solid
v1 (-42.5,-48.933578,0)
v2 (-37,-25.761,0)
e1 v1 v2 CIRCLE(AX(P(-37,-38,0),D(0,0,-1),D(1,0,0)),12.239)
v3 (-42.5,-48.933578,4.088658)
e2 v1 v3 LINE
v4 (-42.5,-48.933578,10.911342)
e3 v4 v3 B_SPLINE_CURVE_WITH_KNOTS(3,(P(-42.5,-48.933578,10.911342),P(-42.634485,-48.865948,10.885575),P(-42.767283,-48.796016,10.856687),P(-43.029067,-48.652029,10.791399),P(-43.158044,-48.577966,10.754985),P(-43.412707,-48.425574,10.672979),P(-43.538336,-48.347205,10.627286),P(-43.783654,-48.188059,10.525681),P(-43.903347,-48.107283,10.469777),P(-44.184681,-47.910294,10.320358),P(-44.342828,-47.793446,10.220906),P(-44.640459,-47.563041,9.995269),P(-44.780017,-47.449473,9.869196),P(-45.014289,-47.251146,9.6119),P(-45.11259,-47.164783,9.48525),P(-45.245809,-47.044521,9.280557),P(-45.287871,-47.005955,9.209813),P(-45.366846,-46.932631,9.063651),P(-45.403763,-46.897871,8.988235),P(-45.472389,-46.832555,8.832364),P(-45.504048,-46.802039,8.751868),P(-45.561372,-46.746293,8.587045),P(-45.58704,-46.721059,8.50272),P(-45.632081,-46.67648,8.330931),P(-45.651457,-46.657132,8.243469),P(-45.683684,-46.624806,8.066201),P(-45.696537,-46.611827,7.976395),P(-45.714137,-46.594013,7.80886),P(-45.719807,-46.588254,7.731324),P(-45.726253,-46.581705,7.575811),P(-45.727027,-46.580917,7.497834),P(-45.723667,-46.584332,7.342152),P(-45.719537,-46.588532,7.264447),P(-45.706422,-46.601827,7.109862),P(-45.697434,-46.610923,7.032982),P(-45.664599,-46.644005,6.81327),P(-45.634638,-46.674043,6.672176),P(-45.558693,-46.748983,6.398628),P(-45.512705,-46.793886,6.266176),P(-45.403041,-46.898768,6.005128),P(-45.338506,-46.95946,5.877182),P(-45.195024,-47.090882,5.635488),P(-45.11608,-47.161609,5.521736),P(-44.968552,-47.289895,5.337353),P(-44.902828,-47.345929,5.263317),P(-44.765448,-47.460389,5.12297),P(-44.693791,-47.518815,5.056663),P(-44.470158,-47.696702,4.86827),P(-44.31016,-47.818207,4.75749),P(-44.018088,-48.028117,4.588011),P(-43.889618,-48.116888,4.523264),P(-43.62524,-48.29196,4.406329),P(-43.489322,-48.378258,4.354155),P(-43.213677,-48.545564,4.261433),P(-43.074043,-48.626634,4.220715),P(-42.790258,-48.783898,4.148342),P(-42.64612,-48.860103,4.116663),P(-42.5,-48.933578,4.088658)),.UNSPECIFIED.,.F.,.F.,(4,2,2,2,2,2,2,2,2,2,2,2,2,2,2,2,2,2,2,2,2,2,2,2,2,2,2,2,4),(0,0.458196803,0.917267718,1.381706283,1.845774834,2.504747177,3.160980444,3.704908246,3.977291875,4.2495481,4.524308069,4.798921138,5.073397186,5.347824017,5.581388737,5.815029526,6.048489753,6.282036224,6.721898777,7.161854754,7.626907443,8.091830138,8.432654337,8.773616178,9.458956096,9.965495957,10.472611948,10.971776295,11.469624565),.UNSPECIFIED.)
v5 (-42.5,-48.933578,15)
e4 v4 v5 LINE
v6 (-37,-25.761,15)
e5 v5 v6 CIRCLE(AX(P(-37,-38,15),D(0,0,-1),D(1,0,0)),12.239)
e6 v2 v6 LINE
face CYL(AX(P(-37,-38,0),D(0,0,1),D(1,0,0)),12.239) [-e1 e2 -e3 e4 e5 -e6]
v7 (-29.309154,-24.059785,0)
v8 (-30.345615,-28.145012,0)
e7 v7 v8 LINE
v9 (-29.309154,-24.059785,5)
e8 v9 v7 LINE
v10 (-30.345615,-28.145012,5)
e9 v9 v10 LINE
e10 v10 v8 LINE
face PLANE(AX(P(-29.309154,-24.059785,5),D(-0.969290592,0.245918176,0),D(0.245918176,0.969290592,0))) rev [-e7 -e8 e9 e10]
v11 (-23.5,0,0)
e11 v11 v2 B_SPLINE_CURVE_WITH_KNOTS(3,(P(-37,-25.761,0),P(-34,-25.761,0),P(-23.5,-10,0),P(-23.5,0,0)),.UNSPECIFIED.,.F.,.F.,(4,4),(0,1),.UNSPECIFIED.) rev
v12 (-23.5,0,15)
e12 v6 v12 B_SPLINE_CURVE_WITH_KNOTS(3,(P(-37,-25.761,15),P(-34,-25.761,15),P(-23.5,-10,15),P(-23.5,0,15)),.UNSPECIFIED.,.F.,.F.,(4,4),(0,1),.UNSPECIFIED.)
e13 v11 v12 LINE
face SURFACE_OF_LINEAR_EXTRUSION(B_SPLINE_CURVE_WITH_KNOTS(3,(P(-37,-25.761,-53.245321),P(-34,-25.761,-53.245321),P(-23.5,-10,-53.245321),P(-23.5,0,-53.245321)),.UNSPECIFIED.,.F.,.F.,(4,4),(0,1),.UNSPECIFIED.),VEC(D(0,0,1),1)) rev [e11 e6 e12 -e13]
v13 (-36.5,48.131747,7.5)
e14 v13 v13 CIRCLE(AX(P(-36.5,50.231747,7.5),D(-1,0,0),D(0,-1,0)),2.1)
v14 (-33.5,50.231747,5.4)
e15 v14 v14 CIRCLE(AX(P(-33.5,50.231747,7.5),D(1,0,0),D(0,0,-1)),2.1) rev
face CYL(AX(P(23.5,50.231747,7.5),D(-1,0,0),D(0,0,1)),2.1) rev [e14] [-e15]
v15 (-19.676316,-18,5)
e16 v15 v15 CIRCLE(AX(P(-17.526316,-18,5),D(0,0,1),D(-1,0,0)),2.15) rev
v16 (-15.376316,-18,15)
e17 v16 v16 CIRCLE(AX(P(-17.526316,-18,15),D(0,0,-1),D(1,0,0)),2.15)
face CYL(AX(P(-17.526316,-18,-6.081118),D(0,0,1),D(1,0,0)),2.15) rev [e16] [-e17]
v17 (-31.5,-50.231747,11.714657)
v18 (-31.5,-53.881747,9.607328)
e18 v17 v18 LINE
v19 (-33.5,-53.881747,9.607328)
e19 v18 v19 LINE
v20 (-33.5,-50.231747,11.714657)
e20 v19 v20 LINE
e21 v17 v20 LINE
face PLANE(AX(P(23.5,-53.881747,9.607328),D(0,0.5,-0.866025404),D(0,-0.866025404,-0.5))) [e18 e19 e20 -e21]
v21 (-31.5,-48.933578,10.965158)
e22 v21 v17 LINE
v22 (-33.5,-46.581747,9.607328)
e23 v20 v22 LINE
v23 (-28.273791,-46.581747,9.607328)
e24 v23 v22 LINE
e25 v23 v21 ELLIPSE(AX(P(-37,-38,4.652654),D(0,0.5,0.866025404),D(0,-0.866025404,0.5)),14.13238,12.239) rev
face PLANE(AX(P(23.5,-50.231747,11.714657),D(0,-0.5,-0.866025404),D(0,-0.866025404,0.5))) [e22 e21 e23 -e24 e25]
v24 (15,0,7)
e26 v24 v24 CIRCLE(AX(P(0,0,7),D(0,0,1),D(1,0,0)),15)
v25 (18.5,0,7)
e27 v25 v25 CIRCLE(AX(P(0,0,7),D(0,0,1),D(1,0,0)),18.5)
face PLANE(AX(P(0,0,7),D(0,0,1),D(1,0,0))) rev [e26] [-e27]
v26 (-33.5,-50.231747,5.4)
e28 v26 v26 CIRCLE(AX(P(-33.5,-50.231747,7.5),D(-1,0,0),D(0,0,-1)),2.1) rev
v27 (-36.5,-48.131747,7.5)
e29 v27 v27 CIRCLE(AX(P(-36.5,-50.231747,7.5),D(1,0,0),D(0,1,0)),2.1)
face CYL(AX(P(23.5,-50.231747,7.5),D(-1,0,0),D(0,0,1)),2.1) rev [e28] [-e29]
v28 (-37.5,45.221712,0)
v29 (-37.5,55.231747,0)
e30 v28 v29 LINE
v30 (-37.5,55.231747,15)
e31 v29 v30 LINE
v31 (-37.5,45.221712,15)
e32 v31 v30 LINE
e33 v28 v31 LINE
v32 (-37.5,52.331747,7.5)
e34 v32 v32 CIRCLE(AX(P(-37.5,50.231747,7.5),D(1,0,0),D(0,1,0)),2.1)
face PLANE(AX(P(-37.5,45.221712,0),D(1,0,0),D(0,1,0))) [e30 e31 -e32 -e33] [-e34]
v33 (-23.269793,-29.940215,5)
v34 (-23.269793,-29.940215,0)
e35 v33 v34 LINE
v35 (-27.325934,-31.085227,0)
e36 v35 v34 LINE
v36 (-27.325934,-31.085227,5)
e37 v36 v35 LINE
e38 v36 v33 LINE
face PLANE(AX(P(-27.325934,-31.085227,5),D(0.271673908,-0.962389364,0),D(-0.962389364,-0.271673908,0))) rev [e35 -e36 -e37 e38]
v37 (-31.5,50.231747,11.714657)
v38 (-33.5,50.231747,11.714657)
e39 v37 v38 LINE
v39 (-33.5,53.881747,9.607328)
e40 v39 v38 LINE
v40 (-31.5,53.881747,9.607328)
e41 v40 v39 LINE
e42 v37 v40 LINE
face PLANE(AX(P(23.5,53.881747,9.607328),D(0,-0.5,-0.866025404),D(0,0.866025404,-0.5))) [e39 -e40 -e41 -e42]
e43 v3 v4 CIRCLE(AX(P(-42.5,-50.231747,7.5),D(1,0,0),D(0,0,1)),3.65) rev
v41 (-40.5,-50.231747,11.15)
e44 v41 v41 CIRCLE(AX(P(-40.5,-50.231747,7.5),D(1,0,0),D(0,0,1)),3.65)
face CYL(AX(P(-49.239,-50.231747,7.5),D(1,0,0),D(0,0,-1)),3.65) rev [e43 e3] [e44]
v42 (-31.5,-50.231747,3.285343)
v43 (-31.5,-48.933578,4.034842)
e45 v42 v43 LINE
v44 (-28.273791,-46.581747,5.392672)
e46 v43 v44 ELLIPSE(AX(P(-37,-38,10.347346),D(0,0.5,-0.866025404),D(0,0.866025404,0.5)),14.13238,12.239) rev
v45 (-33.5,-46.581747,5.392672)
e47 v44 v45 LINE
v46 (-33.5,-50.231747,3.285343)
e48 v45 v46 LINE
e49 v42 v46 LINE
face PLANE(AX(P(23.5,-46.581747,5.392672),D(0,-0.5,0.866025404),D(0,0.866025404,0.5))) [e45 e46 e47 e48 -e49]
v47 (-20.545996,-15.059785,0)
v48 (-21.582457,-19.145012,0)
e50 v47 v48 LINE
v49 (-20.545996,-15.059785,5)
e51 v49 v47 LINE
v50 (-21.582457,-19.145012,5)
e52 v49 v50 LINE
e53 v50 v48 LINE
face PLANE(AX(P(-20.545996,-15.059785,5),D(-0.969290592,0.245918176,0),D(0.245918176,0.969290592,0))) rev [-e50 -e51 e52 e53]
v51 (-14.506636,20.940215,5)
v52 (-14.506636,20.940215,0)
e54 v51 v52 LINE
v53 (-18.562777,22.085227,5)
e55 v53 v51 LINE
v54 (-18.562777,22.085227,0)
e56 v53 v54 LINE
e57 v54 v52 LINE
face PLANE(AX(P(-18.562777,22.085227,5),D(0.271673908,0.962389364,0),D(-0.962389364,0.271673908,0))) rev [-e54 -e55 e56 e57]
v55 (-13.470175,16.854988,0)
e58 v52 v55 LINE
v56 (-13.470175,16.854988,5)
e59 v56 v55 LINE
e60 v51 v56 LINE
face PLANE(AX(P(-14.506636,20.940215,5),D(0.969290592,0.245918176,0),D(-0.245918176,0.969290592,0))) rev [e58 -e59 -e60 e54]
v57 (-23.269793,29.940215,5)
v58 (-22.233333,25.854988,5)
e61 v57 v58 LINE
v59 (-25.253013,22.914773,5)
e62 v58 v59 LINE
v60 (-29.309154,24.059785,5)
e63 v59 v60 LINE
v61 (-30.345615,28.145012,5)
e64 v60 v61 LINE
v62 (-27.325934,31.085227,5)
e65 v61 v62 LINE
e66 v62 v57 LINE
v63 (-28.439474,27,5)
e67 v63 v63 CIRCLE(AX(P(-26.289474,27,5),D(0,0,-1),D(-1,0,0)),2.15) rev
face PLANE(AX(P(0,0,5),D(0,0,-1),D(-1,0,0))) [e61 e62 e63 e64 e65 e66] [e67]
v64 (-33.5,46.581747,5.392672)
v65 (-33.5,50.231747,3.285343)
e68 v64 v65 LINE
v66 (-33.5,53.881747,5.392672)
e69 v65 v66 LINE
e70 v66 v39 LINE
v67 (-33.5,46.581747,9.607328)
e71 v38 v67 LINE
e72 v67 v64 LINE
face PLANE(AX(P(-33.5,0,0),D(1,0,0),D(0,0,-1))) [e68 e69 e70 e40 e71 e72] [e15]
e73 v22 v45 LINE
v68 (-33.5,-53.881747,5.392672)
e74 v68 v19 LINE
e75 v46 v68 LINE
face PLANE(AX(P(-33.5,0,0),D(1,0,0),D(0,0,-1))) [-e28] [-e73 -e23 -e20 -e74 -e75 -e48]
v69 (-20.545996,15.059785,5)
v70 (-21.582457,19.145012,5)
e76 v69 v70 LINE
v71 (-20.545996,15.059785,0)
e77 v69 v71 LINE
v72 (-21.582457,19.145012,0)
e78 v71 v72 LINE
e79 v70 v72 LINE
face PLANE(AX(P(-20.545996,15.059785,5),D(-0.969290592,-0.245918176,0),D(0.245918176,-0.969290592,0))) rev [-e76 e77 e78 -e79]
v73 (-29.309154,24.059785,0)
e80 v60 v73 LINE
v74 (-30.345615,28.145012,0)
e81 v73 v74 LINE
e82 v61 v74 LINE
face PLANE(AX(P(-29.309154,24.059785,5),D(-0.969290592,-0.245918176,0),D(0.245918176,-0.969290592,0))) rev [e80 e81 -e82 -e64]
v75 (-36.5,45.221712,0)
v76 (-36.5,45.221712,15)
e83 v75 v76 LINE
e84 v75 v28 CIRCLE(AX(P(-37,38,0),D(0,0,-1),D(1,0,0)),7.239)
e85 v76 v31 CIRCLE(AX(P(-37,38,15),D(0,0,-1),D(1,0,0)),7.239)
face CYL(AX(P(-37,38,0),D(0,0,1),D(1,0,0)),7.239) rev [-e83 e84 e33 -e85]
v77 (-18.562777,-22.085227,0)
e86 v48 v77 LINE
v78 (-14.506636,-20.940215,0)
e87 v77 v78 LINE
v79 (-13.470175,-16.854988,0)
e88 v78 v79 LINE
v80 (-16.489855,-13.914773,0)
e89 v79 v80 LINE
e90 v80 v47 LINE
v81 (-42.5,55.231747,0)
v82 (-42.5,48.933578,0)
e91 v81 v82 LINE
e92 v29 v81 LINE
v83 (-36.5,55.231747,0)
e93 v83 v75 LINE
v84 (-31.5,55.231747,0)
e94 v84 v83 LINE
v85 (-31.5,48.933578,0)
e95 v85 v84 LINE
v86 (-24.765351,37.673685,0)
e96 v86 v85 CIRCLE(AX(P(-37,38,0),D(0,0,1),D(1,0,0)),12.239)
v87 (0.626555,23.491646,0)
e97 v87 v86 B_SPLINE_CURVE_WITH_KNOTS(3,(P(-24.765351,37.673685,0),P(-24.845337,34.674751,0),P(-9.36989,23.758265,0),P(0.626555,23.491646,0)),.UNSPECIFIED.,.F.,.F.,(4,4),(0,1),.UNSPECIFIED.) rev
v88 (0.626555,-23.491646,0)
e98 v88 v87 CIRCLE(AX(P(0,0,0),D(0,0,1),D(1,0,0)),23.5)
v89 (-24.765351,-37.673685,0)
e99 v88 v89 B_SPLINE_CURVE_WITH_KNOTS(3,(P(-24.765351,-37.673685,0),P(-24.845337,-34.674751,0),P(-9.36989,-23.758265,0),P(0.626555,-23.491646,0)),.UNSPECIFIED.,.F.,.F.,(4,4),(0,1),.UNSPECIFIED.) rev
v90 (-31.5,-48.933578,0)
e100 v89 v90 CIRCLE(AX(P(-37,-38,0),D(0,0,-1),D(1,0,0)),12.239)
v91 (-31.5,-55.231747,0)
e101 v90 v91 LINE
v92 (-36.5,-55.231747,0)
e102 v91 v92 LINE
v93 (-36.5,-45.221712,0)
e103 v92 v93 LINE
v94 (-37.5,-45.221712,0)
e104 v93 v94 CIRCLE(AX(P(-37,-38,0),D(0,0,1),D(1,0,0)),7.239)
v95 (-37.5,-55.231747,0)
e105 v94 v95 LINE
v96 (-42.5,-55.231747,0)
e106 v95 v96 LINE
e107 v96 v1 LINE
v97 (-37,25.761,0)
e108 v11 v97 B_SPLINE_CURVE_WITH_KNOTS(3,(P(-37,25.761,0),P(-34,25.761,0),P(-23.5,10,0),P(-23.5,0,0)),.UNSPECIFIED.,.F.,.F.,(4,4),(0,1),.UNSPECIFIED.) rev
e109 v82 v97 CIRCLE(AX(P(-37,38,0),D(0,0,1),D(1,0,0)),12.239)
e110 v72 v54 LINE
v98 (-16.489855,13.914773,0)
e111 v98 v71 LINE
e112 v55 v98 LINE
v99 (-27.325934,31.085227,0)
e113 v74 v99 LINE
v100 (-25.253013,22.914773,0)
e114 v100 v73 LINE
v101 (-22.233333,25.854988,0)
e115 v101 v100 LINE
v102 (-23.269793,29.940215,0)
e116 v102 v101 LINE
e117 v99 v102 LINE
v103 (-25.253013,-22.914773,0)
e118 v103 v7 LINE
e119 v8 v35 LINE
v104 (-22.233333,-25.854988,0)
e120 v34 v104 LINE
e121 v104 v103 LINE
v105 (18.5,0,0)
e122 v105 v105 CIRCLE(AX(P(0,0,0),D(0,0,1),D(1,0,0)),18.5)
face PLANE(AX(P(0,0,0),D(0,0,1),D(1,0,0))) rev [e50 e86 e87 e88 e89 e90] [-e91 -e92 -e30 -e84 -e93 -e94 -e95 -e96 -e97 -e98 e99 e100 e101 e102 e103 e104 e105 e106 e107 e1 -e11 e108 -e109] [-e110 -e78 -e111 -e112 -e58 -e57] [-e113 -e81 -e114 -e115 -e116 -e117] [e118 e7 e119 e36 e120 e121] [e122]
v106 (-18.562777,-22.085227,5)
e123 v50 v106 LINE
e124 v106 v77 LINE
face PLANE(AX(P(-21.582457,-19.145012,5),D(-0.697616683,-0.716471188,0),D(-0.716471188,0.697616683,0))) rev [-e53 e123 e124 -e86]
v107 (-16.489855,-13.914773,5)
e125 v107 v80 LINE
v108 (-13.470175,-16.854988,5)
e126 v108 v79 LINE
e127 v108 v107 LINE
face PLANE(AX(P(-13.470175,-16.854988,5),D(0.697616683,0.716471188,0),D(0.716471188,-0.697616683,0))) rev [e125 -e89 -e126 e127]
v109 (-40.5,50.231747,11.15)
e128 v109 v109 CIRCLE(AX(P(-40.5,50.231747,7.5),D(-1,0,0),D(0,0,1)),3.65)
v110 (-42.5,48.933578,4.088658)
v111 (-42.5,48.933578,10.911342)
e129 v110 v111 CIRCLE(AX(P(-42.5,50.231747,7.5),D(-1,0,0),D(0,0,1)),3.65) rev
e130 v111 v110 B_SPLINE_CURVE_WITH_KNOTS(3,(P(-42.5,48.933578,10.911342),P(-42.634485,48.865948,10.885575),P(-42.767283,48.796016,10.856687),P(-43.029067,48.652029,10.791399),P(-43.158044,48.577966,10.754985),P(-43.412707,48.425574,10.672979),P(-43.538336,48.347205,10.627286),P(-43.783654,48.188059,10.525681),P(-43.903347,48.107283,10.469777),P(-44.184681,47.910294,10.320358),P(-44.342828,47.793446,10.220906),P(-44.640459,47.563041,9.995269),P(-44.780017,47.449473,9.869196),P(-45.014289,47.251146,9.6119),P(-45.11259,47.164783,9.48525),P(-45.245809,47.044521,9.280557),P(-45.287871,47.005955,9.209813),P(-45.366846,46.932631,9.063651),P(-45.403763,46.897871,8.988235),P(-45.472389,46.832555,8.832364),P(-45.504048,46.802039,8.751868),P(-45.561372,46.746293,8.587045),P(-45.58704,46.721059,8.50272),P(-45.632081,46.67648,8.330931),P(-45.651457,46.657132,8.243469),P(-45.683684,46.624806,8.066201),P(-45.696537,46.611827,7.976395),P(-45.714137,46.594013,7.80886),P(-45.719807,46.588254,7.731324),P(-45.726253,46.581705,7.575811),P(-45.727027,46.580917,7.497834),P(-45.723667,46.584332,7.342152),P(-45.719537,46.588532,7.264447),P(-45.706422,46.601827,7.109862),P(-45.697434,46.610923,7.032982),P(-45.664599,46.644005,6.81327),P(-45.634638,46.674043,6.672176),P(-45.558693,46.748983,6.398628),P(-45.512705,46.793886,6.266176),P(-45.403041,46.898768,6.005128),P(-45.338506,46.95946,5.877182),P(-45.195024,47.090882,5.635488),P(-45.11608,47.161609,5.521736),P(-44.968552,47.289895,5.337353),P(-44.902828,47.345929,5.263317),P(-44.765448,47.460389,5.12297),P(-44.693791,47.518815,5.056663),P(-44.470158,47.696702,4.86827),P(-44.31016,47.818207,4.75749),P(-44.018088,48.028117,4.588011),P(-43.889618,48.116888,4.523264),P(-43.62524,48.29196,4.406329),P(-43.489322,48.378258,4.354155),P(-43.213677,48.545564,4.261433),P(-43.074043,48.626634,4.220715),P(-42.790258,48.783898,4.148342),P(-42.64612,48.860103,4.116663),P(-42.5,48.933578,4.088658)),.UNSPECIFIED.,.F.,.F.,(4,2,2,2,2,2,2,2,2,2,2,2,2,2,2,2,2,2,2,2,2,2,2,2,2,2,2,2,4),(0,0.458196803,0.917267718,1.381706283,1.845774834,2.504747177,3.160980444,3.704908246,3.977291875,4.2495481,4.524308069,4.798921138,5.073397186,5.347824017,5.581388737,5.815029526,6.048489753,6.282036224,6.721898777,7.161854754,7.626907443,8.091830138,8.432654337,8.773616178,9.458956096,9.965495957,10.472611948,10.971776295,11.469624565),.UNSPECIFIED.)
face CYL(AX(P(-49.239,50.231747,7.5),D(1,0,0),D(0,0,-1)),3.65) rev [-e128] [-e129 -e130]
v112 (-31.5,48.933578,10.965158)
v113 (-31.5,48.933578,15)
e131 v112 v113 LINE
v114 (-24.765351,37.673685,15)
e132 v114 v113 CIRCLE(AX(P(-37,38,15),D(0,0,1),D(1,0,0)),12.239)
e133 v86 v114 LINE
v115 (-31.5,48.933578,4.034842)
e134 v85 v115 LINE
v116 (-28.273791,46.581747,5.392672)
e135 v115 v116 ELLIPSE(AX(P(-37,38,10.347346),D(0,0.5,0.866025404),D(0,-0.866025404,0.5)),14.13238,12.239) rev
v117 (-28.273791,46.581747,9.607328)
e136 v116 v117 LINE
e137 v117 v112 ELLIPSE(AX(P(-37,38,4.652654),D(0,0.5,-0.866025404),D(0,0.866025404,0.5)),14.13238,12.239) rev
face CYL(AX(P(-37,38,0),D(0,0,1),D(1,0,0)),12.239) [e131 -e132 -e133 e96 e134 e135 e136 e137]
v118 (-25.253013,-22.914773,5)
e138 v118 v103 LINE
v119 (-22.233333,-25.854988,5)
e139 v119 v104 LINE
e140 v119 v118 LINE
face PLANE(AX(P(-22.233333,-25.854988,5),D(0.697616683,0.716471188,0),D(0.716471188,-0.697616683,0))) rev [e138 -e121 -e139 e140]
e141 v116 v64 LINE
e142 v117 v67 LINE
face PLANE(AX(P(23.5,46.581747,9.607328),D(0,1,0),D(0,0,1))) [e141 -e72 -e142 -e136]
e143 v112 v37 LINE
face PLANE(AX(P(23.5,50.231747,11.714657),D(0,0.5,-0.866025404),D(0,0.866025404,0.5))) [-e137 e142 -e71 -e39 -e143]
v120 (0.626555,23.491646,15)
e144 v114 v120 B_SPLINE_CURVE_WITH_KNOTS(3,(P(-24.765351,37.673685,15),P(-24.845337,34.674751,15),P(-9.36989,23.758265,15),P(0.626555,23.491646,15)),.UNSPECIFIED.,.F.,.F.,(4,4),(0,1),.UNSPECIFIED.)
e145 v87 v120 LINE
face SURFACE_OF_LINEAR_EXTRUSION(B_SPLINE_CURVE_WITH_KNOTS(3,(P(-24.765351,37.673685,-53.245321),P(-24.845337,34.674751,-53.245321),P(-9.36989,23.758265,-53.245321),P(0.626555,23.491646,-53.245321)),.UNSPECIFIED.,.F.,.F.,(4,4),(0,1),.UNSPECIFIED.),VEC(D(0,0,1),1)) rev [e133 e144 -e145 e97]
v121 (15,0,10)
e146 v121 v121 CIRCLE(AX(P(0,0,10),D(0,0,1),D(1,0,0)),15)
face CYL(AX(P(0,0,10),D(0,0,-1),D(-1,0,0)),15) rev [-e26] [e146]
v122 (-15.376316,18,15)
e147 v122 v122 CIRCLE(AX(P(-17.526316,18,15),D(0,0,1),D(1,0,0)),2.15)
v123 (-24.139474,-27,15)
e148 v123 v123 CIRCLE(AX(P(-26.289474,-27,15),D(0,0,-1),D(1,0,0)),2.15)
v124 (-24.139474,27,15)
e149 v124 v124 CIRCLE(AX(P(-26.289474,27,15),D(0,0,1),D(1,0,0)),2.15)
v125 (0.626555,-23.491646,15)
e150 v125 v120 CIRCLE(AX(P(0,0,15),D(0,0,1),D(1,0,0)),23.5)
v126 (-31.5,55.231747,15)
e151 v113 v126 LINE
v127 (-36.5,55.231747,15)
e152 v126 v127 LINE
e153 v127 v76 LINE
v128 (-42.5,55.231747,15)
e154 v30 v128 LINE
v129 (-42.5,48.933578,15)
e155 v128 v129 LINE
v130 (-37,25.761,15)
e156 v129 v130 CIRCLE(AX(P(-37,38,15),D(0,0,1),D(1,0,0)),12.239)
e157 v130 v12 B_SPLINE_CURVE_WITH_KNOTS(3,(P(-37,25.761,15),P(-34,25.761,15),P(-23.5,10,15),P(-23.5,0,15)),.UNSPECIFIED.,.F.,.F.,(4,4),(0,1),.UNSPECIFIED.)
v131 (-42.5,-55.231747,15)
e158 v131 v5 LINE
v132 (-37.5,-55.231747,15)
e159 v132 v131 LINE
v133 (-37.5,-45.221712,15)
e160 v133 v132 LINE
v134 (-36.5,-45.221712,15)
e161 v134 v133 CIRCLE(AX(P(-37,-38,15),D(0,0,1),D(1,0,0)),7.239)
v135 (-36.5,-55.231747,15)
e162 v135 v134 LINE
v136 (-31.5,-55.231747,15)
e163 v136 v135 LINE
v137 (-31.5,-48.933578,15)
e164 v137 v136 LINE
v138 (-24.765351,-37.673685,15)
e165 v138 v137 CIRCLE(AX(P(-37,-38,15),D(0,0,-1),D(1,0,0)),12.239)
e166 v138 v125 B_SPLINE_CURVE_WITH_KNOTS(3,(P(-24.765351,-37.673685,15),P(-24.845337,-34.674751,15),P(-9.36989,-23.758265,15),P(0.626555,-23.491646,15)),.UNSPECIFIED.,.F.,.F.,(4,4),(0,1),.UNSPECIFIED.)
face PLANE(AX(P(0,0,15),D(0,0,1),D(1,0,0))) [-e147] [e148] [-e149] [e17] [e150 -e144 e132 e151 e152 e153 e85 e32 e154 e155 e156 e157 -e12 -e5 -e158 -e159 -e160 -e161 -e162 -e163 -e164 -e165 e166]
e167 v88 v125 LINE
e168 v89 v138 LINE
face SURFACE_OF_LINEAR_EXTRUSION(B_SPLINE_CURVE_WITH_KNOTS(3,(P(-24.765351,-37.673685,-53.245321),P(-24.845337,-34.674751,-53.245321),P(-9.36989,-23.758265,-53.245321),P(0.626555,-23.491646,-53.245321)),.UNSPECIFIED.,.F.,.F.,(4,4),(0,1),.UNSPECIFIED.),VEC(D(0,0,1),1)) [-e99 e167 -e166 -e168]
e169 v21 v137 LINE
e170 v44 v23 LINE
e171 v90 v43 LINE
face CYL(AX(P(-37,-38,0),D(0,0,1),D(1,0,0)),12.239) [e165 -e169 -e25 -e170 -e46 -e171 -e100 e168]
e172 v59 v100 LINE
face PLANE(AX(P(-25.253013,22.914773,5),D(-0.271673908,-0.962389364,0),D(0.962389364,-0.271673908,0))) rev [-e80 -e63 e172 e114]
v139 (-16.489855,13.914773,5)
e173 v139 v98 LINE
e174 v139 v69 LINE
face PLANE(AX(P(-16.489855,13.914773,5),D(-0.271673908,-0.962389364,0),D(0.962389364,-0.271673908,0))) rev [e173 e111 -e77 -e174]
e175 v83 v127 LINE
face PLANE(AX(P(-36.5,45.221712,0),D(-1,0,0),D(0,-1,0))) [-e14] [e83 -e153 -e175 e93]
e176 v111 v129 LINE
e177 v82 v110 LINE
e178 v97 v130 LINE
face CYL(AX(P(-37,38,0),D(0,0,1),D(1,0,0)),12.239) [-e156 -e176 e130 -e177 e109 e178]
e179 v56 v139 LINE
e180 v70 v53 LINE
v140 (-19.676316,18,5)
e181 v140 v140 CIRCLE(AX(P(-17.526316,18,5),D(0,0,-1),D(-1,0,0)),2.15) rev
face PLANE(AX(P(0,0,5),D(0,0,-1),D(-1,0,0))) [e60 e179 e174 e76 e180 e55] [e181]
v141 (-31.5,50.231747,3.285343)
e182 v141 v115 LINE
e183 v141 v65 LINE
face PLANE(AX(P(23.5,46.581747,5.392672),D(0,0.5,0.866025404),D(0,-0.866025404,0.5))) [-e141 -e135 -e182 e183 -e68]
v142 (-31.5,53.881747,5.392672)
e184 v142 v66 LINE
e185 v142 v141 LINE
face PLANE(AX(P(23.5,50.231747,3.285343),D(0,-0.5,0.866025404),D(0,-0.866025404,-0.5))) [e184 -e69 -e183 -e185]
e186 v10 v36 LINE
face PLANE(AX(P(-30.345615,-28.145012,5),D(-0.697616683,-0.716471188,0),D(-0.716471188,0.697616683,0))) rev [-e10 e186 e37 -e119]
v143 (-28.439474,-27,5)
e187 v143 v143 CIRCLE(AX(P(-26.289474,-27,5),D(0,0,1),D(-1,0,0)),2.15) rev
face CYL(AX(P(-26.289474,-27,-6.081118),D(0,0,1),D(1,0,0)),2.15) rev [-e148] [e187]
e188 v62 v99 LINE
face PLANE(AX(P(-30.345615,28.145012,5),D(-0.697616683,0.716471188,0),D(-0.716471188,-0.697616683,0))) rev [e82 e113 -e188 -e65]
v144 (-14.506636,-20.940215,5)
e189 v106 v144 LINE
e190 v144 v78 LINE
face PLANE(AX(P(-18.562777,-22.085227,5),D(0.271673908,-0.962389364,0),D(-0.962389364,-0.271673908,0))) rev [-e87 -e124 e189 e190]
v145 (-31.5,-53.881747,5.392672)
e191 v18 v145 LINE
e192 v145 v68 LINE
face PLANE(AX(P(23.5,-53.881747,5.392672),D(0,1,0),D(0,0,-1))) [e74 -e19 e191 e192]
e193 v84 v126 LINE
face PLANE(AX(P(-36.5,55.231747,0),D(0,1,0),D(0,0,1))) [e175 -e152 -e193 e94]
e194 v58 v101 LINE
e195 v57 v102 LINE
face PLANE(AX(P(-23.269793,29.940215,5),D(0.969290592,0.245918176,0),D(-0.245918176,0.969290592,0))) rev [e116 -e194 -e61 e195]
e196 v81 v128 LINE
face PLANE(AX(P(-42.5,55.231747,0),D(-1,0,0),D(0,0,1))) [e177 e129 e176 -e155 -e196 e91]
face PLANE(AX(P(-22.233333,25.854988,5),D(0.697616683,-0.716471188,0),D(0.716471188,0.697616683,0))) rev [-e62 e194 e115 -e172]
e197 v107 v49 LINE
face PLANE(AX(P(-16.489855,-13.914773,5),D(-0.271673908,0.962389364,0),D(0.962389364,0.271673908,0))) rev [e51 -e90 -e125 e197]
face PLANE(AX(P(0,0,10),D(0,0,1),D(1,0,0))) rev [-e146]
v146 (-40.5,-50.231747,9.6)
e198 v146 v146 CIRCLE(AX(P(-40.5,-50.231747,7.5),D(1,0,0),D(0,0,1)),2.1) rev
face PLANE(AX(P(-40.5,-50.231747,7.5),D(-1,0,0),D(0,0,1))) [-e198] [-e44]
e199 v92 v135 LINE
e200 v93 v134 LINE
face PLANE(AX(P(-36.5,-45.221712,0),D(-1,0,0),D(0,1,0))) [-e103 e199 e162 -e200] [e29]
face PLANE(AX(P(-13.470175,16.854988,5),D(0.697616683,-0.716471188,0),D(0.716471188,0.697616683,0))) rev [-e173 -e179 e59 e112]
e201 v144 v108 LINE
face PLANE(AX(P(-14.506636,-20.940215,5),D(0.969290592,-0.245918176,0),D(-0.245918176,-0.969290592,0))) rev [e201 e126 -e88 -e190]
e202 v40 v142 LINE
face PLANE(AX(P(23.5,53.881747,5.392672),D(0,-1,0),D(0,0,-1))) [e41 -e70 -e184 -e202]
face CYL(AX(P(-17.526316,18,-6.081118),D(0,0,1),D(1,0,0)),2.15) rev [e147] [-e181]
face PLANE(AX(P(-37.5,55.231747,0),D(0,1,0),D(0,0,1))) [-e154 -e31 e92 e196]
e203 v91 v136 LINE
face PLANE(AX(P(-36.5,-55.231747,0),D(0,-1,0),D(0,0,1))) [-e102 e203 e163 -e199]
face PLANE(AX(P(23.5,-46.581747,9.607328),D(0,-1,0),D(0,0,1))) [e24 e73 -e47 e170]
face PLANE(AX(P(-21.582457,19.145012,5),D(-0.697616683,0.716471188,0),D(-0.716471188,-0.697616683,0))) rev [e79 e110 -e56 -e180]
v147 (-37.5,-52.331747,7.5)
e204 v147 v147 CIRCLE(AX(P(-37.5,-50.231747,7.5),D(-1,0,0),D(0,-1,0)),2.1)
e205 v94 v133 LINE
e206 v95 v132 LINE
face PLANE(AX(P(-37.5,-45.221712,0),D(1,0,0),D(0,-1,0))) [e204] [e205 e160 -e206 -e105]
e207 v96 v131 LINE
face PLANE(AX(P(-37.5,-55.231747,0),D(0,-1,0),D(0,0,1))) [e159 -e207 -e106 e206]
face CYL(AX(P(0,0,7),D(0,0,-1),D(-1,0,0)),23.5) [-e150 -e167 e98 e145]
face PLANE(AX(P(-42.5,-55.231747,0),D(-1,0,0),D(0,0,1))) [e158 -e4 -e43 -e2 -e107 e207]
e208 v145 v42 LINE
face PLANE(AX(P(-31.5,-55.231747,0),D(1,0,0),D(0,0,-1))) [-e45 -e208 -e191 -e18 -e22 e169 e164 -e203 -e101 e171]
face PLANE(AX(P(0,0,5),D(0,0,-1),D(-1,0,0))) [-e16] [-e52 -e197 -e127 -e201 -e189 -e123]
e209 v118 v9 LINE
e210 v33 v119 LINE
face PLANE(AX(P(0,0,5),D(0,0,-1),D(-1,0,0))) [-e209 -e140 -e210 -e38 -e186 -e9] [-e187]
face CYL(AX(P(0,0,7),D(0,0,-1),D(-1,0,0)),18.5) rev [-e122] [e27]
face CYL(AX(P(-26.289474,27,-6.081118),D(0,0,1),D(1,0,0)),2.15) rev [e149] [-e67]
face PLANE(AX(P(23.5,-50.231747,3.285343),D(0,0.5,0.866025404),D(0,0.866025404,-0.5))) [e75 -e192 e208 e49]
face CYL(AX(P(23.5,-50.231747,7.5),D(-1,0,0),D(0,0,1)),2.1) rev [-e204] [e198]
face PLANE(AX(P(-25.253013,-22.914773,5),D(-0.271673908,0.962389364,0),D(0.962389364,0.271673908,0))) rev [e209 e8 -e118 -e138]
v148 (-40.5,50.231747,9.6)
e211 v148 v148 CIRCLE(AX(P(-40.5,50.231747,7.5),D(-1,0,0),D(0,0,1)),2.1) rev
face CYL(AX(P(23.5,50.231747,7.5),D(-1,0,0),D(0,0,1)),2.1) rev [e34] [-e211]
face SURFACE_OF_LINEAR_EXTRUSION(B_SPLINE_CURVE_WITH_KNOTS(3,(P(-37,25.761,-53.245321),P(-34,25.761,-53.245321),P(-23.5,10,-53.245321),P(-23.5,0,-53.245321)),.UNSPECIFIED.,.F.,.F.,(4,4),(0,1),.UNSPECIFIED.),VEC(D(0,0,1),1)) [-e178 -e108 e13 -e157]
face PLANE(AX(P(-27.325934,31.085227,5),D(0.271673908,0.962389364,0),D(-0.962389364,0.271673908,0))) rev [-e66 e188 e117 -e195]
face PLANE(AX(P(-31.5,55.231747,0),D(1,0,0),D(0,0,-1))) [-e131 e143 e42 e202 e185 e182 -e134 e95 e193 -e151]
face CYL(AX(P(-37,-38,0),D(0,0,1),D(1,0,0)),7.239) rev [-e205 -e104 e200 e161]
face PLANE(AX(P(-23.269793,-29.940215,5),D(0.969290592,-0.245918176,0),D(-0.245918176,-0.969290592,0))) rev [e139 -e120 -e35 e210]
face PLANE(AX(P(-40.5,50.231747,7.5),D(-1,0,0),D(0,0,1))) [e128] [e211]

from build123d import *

# Parameters (mm, degrees)
SKETCH1_R               = 23.5
SKETCH1_R_2             = 18.5
BOSS_EXTRUDE1_DEPTH     = 7
SKETCH2_R               = 23.5
SKETCH2_R_2             = 15
BOSS_EXTRUDE2_DEPTH     = 3
SKETCH3_R               = 23.5
BOSS_EXTRUDE3_DEPTH     = 5
BOSS_EXTRUDE4_DEPTH     = 15
CUT_EXTRUDE1_DEPTH      = 88.358719822
CUT_EXTRUDE1_DEPTH_BACK = 88.358719822
SKETCH5_R               = 2.1
CUT_EXTRUDE2_DEPTH      = 88.35871984
CUT_EXTRUDE2_DEPTH_BACK = 2
SKETCH6_R               = 3.65
CUT_EXTRUDE3_DEPTH      = 80.375978306
CUT_EXTRUDE3_DEPTH_BACK = 2
BOSS_EXTRUDE6_START     = -15
BOSS_EXTRUDE6_DEPTH     = 15
SKETCH9_R               = 2.15
CUT_EXTRUDE4_DEPTH      = 15
CUT_EXTRUDE5_DEPTH      = 5
SKETCH11_W              = 94.20005325
SKETCH11_H              = 33.320618951
CUT_EXTRUDE6_DEPTH      = 25


# Read off the part's stored shape, not the designer's step: Boss-Extrude6
with BuildPart() as part:
    # Sketch1 → Boss-Extrude1 (new body)
    with BuildSketch(Plane.XY):
        Circle(SKETCH1_R)
        Circle(SKETCH1_R_2, mode=Mode.SUBTRACT)
    extrude(amount=BOSS_EXTRUDE1_DEPTH)

    # Sketch2 → Boss-Extrude2 (add)
    with BuildSketch(Plane.XY.offset(7)):
        Circle(SKETCH2_R)
        Circle(SKETCH2_R_2, mode=Mode.SUBTRACT)
    extrude(amount=BOSS_EXTRUDE2_DEPTH)

    # Sketch3 → Boss-Extrude3 (add)
    with BuildSketch(Plane.XY.offset(10)):
        Circle(SKETCH3_R)
    extrude(amount=BOSS_EXTRUDE3_DEPTH)



with BuildPart() as body_2:
    # Sketch4 → Boss-Extrude4 (new body)
    with BuildSketch(Plane.XY.offset(15)):
        with BuildLine():
            Line((-37.5, 45.221711778), (-37.5, 55.231747474))
            Line((-37.5, 55.231747474), (-42.5, 55.231747474))
            Line((-42.5, 55.231747474), (-42.5, 48.933577685))
            ThreePointArc((-42.5, 48.933577685), (-37, 25.761), (-31.5, 48.933577685))
            Line((-31.5, 48.933577685), (-31.5, 55.231747474))
            Line((-31.5, 55.231747474), (-36.5, 55.231747474))
            Line((-36.5, 55.231747474), (-36.5, 45.221711778))
            ThreePointArc((-36.5, 45.221711778), (-37, 30.761), (-37.5, 45.221711778))
        make_face()
    extrude(amount=-BOSS_EXTRUDE4_DEPTH)

    # Sketch5 → Cut-Extrude1 (cut, two sides: drawn at the far end of the back side and taken through both)
    with BuildSketch(Plane.ZY.offset(42.5).offset(-CUT_EXTRUDE1_DEPTH_BACK)):
        with Locations(Location((7.5, 50.231747474, 0), (0, 0, 321.816935122))):
            Circle(SKETCH5_R)
    extrude(amount=CUT_EXTRUDE1_DEPTH + CUT_EXTRUDE1_DEPTH_BACK, mode=Mode.SUBTRACT)

    # Sketch6 → Cut-Extrude2 (cut, two sides: drawn at the far end of the back side and taken through both)
    with BuildSketch(Plane.ZY.offset(42.5).offset(-CUT_EXTRUDE2_DEPTH_BACK)):
        with Locations(Location((7.5, 50.231747474, 0), (0, 0, 200.834080871))):
            Circle(SKETCH6_R)
    extrude(amount=CUT_EXTRUDE2_DEPTH + CUT_EXTRUDE2_DEPTH_BACK, mode=Mode.SUBTRACT)

    # Sketch7 → Cut-Extrude3 (cut, two sides: drawn at the far end of the back side and taken through both)
    with BuildSketch(Plane(origin=(-31.5, 0, 0), x_dir=(0, 0, -1), z_dir=(1, 0, 0)).offset(-CUT_EXTRUDE3_DEPTH_BACK)):
        Polygon((-5.392671517, 53.881747474), (-9.607328483, 53.881747474), (-11.714656965, 50.231747474), (-9.607328483, 46.581747474), (-5.392671517, 46.581747474), (-3.285343035, 50.231747474), align=None)
    extrude(amount=CUT_EXTRUDE3_DEPTH + CUT_EXTRUDE3_DEPTH_BACK, mode=Mode.SUBTRACT)


with BuildPart() as part_1:
    add(part.part)

    add(body_2.part)  # Boss-Extrude6 merges body 2
    # Boss-Extrude6 outline → Boss-Extrude6 (add)
    with BuildSketch(Plane.XY.offset(15).offset(BOSS_EXTRUDE6_START)):
        with BuildLine():
            ThreePointArc((-24.765350871, 37.673684678), (-28.461869415, 29.231109129), (-37, 25.761))
            add(Edge.make_bspline(
                [(-37, 25.761), (-34, 25.761), (-23.5, 10), (-23.5, 0)],
                knots=[0, 0, 0, 0, 1, 1, 1, 1], degree=3))
            ThreePointArc((-23.5, 0), (-16.393992054, 16.83707292), (0.626555279, 23.49164593))
            add(Edge.make_bspline(
                [(-24.765350871, 37.673684678), (-24.845336651, 34.674751155), (-9.369889797, 23.758265197), (0.626555279, 23.49164593)],
                knots=[0, 0, 0, 0, 1, 1, 1, 1], degree=3))
        make_face()
    extrude(amount=BOSS_EXTRUDE6_DEPTH)

    # Sketch9 → Cut-Extrude4 (cut)
    with BuildSketch(Plane.XY.offset(15)):
        with Locations((-17.526315789, 18)):
            Circle(SKETCH9_R)
        with Locations((-26.289473684, 27)):
            Circle(SKETCH9_R)
    extrude(amount=-CUT_EXTRUDE4_DEPTH, mode=Mode.SUBTRACT)

    # Sketch10 → Cut-Extrude5 (cut)
    with BuildSketch(Plane(origin=(0, 0, 0), x_dir=(-1, 0, 0), z_dir=(0, 0, -1))):
        Polygon((25.253012932, 22.914772657), (29.309153967, 24.059784987), (30.345614719, 28.14501233), (27.325934436, 31.085227343), (23.269793401, 29.940215013), (22.233332649, 25.85498767), align=None)
        Polygon((16.489855038, 13.914772657), (20.545996073, 15.059784987), (21.582456825, 19.14501233), (18.562776541, 22.085227343), (14.506635506, 20.940215013), (13.470174754, 16.85498767), align=None)
    extrude(amount=-CUT_EXTRUDE5_DEPTH, mode=Mode.SUBTRACT)

    # Sketch11 → Cut-Extrude6 (cut)
    with BuildSketch(Plane(origin=(0, 0, 0), x_dir=(1, 0, 0), z_dir=(0, 1, 0))):
        with Locations((-10.776769446, -9.973227019)):
            Rectangle(SKETCH11_W, SKETCH11_H)
    extrude(amount=-CUT_EXTRUDE6_DEPTH, mode=Mode.SUBTRACT)

    # Mirror4: part across plane


with BuildPart() as part_2:
    add(part_1.part)
    add(part_1.part.mirror(Plane.ZX))


solid = part_2.part
